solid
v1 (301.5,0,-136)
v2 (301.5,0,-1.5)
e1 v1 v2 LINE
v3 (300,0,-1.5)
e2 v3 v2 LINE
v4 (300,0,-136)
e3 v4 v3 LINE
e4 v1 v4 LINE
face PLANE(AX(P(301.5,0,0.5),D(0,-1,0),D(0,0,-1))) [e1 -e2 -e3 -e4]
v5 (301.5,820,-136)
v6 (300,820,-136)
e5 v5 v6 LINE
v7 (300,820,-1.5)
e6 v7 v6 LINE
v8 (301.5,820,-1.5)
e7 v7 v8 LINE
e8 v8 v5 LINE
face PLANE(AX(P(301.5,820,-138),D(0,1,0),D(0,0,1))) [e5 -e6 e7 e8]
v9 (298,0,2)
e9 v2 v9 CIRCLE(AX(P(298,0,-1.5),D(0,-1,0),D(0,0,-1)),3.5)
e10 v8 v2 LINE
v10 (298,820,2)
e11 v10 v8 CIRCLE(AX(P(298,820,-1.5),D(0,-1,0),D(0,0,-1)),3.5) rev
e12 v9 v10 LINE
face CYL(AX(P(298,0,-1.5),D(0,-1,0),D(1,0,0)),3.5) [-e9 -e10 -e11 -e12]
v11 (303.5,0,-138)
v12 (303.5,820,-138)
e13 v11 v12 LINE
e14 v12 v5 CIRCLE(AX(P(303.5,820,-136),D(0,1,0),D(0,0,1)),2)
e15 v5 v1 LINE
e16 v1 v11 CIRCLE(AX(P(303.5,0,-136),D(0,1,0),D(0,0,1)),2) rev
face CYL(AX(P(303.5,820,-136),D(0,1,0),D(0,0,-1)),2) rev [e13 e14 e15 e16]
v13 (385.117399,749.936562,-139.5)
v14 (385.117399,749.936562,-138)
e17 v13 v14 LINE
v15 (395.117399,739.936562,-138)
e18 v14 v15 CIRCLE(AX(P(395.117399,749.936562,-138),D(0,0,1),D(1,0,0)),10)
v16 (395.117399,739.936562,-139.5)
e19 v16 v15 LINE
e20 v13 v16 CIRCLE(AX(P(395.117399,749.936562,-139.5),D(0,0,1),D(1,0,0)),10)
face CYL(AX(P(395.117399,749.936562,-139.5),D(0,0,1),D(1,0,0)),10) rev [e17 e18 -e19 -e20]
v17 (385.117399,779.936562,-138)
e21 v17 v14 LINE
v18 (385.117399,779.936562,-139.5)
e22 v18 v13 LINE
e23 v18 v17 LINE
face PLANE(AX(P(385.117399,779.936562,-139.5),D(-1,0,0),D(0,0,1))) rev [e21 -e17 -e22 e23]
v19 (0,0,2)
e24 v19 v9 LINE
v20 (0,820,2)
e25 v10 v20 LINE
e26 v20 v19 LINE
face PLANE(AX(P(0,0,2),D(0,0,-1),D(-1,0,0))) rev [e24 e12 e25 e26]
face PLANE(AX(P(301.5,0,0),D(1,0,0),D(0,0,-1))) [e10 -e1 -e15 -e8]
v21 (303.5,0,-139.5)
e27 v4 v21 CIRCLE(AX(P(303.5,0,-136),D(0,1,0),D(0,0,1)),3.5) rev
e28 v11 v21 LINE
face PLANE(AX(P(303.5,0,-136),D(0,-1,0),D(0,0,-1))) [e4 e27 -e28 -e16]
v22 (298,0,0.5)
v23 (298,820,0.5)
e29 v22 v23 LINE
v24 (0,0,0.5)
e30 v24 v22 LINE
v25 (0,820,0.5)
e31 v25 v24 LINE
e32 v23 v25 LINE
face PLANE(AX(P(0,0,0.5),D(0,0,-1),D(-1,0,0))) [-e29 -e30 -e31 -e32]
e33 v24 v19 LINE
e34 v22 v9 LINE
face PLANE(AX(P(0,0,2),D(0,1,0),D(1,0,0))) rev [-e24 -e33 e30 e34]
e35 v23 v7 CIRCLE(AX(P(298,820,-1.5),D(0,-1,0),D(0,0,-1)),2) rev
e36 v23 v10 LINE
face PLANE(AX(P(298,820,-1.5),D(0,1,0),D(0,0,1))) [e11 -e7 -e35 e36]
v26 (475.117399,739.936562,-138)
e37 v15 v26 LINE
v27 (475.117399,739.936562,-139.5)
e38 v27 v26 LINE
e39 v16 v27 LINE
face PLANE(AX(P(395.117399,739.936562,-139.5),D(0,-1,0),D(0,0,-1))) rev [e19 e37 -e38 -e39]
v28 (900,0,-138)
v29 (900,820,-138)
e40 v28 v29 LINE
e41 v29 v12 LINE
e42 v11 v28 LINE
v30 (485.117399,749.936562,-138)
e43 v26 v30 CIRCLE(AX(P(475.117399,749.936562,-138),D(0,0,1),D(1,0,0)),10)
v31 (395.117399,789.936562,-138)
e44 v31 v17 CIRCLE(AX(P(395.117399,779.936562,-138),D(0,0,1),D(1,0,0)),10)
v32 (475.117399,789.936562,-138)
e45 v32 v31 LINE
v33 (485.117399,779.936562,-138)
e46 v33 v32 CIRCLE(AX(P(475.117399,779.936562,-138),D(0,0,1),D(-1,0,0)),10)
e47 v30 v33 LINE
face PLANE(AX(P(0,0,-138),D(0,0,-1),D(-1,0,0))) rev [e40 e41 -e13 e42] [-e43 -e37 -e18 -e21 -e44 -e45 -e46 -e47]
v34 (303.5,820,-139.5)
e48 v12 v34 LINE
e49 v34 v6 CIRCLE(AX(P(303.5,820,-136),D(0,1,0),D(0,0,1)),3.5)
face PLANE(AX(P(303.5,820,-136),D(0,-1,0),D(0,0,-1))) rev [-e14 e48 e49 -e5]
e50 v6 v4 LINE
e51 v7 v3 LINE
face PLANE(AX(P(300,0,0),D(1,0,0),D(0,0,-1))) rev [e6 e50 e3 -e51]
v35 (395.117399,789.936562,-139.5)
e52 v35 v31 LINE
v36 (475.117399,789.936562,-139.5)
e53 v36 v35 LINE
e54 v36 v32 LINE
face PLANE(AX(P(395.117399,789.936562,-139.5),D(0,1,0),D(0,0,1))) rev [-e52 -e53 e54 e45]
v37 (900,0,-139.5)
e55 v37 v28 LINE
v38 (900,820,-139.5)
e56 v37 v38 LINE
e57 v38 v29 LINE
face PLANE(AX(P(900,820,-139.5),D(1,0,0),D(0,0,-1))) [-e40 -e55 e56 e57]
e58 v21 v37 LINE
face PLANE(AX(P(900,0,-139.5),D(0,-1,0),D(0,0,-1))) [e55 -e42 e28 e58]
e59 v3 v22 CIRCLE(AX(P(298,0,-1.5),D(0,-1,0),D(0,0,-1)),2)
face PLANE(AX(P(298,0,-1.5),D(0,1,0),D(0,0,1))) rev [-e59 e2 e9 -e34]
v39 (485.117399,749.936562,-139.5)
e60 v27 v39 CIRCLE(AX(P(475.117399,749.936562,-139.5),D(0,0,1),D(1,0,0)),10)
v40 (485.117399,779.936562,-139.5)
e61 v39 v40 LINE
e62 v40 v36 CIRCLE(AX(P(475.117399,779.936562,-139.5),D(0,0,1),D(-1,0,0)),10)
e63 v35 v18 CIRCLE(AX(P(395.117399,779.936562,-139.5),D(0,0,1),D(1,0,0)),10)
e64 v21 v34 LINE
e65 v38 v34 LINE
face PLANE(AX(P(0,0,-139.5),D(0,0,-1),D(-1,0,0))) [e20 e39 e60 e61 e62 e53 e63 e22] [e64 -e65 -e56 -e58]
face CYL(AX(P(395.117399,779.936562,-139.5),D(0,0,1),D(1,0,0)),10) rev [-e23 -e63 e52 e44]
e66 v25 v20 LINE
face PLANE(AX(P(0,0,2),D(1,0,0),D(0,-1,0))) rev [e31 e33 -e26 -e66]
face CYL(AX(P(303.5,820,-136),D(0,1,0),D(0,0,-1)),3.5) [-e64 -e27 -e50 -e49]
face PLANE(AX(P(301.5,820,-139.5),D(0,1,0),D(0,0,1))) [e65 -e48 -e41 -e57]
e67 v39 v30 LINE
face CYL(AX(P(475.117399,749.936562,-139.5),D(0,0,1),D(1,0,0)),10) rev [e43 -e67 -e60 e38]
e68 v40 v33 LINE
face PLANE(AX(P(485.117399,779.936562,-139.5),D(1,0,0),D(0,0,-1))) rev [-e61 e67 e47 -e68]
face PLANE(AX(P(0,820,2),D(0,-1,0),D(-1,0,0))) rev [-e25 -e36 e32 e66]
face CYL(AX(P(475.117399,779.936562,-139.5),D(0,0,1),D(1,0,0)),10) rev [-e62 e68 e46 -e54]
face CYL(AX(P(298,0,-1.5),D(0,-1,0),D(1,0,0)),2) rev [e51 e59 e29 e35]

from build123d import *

# Parameters (mm, degrees)
SKETCH1_W                    = 300
SKETCH1_H                    = 820
BOSS_EXTRUDE1_DEPTH          = 2
CONVERT_SOLID1_OUTLINE_W     = 300
CONVERT_SOLID1_OUTLINE_H     = 820
CONVERT_SOLID1_DEPTH         = 0.5
EDGE_FLANGE1_STRIP_W         = 10
EDGE_FLANGE1_STRIP_H         = 1.5
EDGE_FLANGE1_STRIP_CUT_DEPTH = 820
EDGE_FLANGE1_DEPTH           = 820
EDGE_FLANGE2_STRIP_W         = 10
EDGE_FLANGE2_STRIP_H         = 1.5
EDGE_FLANGE2_STRIP_CUT_DEPTH = 820
EDGE_FLANGE2_DEPTH           = 820
CUT_EXTRUDE1_DEPTH           = 1226.561095988


# Read off the part's stored shape, not the designer's step: Convert-Solid1
# Sheet-metal steps are written as plain solids
with BuildPart() as part:
    # Sketch1 → Boss-Extrude1 (new body)
    with BuildSketch(Plane.XY):
        with Locations((150, 410)):
            Rectangle(SKETCH1_W, SKETCH1_H)
    extrude(amount=BOSS_EXTRUDE1_DEPTH)

    # Convert-Solid1 outline → Convert-Solid1 (cut)
    with BuildSketch(Plane.XY):
        with Locations((150, 410)):
            Rectangle(CONVERT_SOLID1_OUTLINE_W, CONVERT_SOLID1_OUTLINE_H)
    extrude(amount=CONVERT_SOLID1_DEPTH, mode=Mode.SUBTRACT)

    # Edge-Flange1 strip (across the edge) → Edge-Flange1 strip cut (cut)
    with BuildSketch(Plane(origin=(300, 820, 0.5), x_dir=(-1, 0, 0), z_dir=(0, -1, 0))):
        with Locations((-3, -0.75)):
            Rectangle(EDGE_FLANGE1_STRIP_W, EDGE_FLANGE1_STRIP_H)
    extrude(amount=EDGE_FLANGE1_STRIP_CUT_DEPTH, mode=Mode.SUBTRACT)

    # Edge-Flange1 section (across the edge) → Edge-Flange1 (add)
    with BuildSketch(Plane(origin=(300, 820, 0.5), x_dir=(-1, 0, 0), z_dir=(0, -1, 0))):
        with BuildLine():
            Line((-1.5, 2), (-1.5, 138.5))
            Line((-1.5, 138.5), (0, 138.5))
            Line((0, 138.5), (0, 2))
            ThreePointArc((0, 2), (0.585786438, 0.585786438), (2, 0))
            Line((2, 0), (2, -1.5))
            ThreePointArc((2, -1.5), (-0.474873734, -0.474873734), (-1.5, 2))
        make_face()
    extrude(amount=EDGE_FLANGE1_DEPTH)

    # Edge-Flange2 strip (across the edge) → Edge-Flange2 strip cut (cut)
    with BuildSketch(Plane(origin=(301.5, 0, -138), x_dir=(0, 0, 1), z_dir=(0, 1, 0))):
        with Locations((-3, -0.75)):
            Rectangle(EDGE_FLANGE2_STRIP_W, EDGE_FLANGE2_STRIP_H)
    extrude(amount=EDGE_FLANGE2_STRIP_CUT_DEPTH, mode=Mode.SUBTRACT)

    # Edge-Flange2 section (across the edge) → Edge-Flange2 (add)
    with BuildSketch(Plane(origin=(301.5, 0, -138), x_dir=(0, 0, 1), z_dir=(0, 1, 0))):
        with BuildLine():
            Line((-1.5, 2), (-1.5, 598.5))
            Line((-1.5, 598.5), (0, 598.5))
            Line((0, 598.5), (0, 2))
            ThreePointArc((0, 2), (0.585786438, 0.585786438), (2, 0))
            Line((2, 0), (2, -1.5))
            ThreePointArc((2, -1.5), (-0.474873734, -0.474873734), (-1.5, 2))
        make_face()
    extrude(amount=EDGE_FLANGE2_DEPTH)

    # Sketch12 → Cut-Extrude1 (cut, through all)
    with BuildSketch(Plane.XY.offset(-138)):
        with BuildLine():
            Line((395.117398745, 789.936561894), (475.117398745, 789.936561894))
            ThreePointArc((475.117398745, 789.936561894), (482.188466557, 787.007629706), (485.117398745, 779.936561894))
            Line((485.117398745, 779.936561894), (485.117398745, 749.936561894))
            ThreePointArc((485.117398745, 749.936561894), (482.188466557, 742.865494082), (475.117398745, 739.936561894))
            Line((475.117398745, 739.936561894), (395.117398745, 739.936561894))
            ThreePointArc((395.117398745, 739.936561894), (388.046330933, 742.865494082), (385.117398745, 749.936561894))
            Line((385.117398745, 749.936561894), (385.117398745, 779.936561894))
            ThreePointArc((385.117398745, 779.936561894), (388.046330933, 787.007629706), (395.117398745, 789.936561894))
        make_face()
    extrude(amount=-CUT_EXTRUDE1_DEPTH, mode=Mode.SUBTRACT)


solid = part.part
